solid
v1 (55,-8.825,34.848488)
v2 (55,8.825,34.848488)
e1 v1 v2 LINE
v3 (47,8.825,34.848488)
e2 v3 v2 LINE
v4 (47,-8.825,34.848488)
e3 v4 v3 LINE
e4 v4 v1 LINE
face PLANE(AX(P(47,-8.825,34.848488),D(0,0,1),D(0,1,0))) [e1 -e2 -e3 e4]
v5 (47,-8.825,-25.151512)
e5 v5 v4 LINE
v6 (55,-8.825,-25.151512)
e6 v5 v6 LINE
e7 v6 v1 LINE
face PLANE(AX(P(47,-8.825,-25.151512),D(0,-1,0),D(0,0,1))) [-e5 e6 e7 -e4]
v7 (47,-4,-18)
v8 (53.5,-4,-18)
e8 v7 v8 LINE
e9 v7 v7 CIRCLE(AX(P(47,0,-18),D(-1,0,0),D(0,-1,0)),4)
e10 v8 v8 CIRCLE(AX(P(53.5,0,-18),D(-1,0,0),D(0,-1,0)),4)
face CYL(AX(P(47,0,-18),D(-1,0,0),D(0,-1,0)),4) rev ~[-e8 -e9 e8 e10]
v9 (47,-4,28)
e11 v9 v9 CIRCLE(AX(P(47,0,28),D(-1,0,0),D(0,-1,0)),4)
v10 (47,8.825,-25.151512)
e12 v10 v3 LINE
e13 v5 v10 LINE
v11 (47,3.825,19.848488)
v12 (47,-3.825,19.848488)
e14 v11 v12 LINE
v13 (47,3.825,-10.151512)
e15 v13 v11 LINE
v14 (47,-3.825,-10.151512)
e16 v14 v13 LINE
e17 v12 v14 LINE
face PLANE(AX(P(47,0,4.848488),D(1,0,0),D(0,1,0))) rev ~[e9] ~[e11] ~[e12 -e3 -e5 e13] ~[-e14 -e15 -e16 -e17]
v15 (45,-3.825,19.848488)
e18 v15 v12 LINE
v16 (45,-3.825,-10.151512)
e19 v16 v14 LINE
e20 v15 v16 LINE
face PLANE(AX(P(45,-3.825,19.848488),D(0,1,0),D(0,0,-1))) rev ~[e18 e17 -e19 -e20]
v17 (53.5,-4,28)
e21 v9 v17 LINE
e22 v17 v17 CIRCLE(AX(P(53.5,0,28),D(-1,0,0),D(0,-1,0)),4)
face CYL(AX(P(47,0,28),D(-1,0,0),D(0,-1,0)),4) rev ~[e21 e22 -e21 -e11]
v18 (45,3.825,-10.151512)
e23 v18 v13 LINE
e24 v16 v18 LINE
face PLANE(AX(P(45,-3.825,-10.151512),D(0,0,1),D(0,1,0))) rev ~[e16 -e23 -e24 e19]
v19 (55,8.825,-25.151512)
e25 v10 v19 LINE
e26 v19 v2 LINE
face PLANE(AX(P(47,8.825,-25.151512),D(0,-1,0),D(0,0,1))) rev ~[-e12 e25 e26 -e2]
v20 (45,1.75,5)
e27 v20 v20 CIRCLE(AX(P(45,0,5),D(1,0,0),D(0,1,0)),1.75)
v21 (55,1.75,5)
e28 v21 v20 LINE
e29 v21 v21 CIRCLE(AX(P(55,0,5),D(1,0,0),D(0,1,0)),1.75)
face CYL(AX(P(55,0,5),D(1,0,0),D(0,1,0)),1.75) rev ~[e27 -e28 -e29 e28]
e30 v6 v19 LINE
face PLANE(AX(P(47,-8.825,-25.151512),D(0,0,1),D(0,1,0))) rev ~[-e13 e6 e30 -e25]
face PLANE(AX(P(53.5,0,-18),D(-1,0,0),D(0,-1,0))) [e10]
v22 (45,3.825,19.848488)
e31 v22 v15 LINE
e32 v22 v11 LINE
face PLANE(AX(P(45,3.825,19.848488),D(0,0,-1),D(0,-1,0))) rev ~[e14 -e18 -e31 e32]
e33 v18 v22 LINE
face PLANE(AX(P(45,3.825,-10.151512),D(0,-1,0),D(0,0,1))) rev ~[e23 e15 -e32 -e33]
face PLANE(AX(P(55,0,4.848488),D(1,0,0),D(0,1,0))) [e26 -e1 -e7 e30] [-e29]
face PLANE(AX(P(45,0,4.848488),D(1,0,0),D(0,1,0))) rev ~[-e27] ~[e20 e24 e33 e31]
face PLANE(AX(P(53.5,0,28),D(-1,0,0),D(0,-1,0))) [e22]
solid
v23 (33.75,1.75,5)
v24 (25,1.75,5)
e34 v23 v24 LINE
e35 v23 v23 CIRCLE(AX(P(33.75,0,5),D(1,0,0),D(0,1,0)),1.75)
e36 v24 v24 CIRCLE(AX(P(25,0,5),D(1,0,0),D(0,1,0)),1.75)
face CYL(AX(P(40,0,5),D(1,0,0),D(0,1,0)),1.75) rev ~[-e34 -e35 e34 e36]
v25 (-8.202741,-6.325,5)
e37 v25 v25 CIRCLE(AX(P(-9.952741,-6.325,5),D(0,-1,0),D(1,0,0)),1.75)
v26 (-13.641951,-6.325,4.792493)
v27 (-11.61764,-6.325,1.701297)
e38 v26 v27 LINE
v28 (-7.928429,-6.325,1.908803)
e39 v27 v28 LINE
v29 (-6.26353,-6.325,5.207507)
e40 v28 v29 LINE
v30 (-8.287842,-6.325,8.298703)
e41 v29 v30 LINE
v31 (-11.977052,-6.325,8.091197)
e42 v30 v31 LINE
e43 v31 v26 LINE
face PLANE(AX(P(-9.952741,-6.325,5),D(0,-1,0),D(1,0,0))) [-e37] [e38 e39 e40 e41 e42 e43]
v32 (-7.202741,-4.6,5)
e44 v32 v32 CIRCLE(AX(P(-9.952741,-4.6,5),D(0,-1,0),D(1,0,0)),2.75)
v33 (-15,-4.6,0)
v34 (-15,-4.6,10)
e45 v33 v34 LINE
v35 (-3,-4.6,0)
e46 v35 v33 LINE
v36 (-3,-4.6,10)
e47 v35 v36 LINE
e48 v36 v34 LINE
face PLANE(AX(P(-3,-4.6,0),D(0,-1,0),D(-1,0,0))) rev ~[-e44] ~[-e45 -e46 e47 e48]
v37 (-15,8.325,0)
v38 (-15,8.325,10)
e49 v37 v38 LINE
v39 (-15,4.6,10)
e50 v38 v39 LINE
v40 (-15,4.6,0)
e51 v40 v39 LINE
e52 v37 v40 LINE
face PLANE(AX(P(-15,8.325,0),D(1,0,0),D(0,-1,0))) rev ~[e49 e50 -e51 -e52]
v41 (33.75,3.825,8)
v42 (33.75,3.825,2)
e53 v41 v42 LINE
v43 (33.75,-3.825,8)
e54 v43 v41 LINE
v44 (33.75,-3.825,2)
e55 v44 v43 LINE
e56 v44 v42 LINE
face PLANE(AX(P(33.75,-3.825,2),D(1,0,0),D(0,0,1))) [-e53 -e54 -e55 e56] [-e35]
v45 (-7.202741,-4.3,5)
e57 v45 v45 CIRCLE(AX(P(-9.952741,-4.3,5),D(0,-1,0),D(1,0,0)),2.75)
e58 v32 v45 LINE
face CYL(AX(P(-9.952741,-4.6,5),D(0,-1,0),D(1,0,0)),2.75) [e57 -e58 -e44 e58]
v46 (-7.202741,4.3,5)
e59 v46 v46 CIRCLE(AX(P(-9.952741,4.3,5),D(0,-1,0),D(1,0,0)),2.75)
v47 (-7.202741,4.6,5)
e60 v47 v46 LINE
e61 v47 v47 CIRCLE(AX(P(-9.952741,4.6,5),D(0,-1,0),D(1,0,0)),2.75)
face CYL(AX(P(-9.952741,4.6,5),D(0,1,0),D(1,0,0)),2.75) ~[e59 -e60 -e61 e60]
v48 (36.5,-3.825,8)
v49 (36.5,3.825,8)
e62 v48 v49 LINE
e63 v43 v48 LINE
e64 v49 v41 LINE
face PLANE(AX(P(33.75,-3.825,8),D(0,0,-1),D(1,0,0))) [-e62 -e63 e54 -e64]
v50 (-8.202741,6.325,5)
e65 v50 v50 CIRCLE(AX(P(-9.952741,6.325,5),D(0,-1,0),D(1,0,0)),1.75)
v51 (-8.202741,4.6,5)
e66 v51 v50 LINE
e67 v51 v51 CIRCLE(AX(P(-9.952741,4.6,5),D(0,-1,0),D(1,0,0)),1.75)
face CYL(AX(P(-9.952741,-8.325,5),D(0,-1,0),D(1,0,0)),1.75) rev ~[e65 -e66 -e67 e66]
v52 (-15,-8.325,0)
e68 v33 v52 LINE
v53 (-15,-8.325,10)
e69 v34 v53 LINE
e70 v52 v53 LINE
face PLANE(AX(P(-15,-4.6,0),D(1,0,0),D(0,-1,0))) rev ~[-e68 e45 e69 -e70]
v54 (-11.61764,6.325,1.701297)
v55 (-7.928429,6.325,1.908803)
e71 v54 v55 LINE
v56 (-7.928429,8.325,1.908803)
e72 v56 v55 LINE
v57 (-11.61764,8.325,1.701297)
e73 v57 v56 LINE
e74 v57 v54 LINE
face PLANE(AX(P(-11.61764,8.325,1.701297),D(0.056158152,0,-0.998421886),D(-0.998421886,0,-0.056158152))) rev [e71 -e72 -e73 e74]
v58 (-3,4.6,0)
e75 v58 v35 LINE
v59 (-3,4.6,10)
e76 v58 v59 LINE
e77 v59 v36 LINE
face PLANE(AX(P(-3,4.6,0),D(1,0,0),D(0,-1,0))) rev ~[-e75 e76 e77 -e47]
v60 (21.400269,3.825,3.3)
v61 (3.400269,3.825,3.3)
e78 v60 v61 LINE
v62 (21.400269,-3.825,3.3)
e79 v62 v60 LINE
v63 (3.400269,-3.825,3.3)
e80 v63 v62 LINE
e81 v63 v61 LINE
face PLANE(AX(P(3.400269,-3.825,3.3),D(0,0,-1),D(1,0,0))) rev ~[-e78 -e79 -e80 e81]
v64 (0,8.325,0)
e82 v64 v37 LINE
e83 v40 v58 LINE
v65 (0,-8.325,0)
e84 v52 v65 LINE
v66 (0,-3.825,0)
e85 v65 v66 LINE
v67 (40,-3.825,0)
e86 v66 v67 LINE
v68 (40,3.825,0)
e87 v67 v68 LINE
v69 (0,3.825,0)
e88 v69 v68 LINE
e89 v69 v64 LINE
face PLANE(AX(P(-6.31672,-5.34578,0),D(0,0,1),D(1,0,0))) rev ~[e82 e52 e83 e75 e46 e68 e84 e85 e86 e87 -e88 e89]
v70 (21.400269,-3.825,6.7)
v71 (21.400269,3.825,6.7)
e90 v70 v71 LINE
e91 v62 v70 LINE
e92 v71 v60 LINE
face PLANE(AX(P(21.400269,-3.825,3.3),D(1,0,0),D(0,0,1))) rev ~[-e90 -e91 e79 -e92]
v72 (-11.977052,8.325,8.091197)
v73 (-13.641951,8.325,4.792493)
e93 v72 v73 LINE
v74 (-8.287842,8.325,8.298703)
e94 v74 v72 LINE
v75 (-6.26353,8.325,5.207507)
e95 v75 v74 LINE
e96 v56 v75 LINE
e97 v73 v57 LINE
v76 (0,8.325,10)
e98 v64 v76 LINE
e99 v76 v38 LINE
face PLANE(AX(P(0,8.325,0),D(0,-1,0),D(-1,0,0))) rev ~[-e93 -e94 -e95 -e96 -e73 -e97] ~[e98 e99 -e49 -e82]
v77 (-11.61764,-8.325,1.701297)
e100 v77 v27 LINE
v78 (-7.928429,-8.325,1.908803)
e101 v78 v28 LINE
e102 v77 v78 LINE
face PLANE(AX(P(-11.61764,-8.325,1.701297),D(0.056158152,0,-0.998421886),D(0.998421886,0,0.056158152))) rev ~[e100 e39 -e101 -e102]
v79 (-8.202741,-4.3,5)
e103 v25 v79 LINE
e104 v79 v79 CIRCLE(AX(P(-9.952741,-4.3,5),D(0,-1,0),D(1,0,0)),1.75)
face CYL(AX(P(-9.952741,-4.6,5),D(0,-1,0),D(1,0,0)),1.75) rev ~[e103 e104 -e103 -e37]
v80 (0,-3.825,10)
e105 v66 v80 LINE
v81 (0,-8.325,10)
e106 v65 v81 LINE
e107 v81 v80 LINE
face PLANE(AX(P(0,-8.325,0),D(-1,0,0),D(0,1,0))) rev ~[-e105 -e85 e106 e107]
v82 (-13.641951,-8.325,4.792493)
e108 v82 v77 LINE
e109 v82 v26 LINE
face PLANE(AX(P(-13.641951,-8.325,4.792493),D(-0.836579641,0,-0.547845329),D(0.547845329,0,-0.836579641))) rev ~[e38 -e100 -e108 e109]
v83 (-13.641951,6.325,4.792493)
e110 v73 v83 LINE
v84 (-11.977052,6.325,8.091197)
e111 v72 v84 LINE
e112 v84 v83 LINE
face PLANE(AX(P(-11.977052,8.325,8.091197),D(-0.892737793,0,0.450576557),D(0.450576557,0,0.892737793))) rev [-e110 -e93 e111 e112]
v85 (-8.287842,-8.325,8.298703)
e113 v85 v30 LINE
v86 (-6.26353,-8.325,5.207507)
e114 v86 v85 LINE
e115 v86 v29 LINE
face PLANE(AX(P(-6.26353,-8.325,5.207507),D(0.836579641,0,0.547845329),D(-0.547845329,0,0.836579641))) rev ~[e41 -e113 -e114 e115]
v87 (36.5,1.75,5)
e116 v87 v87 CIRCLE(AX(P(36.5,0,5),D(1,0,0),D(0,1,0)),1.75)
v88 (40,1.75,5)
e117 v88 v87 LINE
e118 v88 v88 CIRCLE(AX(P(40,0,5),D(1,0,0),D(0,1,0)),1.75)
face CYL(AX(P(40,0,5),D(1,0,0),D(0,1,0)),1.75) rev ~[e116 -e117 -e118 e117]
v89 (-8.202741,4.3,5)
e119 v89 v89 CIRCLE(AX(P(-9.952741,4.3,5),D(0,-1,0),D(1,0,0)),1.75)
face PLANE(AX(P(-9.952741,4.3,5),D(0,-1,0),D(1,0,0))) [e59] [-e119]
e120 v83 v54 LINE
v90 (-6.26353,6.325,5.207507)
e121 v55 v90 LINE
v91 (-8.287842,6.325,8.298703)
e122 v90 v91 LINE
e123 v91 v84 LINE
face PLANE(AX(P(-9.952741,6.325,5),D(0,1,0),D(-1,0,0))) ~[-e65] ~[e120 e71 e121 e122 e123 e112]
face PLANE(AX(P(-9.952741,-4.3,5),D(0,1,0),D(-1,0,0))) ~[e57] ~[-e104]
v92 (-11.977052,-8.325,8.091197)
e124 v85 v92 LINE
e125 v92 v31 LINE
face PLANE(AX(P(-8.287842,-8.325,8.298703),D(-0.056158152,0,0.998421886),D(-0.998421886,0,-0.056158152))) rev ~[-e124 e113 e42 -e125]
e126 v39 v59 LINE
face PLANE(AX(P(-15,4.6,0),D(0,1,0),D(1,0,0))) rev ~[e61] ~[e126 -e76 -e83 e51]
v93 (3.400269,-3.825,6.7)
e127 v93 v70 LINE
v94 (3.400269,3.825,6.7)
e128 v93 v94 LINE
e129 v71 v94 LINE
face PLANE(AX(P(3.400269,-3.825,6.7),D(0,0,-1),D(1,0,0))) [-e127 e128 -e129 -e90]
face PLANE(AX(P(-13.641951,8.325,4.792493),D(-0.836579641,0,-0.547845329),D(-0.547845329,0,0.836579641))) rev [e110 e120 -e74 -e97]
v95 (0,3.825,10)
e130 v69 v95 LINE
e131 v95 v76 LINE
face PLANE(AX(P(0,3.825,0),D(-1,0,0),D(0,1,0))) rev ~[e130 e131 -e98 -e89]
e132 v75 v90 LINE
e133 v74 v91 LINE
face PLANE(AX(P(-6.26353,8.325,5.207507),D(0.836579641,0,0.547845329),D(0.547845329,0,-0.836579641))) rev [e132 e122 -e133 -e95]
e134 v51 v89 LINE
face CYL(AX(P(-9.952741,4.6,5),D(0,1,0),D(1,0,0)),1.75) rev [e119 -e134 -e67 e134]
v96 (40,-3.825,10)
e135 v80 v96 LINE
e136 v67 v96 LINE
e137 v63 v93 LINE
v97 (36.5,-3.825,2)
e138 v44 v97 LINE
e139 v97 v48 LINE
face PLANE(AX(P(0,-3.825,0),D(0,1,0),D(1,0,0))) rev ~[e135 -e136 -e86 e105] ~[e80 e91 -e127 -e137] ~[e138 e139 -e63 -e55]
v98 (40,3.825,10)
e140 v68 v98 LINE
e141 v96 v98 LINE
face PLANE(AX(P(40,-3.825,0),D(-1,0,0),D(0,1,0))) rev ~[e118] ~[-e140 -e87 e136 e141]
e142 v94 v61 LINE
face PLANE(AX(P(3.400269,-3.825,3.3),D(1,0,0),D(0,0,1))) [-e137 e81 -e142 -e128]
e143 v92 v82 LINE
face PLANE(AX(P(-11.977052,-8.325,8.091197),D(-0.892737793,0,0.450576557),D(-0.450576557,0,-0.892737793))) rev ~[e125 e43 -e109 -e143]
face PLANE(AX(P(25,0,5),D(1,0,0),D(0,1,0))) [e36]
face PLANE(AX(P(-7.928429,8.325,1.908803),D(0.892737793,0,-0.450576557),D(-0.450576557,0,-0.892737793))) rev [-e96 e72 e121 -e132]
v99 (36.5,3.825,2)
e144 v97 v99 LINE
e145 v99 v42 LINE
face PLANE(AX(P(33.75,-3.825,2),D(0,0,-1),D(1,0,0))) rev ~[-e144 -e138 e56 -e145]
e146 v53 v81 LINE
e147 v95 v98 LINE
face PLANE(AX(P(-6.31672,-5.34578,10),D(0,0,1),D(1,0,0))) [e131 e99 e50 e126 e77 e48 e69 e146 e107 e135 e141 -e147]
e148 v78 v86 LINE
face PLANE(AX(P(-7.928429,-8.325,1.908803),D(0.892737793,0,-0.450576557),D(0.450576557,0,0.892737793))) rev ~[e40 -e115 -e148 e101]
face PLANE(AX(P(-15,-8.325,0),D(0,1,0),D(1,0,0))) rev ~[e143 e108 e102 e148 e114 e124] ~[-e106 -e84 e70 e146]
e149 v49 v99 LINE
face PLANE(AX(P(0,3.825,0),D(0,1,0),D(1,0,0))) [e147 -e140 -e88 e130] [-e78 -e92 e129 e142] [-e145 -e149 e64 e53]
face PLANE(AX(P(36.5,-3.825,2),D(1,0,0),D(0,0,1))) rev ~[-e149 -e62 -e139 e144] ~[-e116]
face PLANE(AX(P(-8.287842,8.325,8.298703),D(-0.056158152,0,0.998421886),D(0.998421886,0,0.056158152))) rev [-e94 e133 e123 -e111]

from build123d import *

# Parameters (mm, degrees)
F0_W      = 40
F0_H      = 3.825
F1_DEPTH  = 10
F2_R      = 1.75
F3_DEPTH  = 16.651
F4_W      = 18
F4_H      = 3.4
F4_W_2    = 2.75
F4_H_2    = 6
F5_DEPTH  = 12.151
F6_R      = 1.75
F7_DEPTH  = 15
F10_DEPTH = 2
F11_W     = 17.65
F11_H     = 60
F12_DEPTH = 8
F13_R     = 1.75
F14_DEPTH = 70.001
F15_R     = 2.75
F15_R_2   = 1.75
F16_DEPTH = 0.3
F17_R     = 1.75
F18_DEPTH = 2
F19_R     = 4
F20_DEPTH = 6.5


# Not quite as in the source:
# - a pattern or mirror of a feature is missing from the dataset's text; its kind, count and spacing are read off the source's solid


with BuildPart() as f1:
    # F0 (on Top) → F1 (new body)
    with BuildSketch(Plane.XY):
        Polygon((0, -3.825), (0, 0), (-3, 0), (-3, -4.6), (-15, -4.6), (-15, -8.325), (0, -8.325), align=None)
        Polygon((-3, 0), (0, 0), (0, 3.825), (0, 8.325), (-15, 8.325), (-15, 4.6), (-3, 4.6), align=None)
        with Locations((20, 1.9125)):
            Rectangle(F0_W, F0_H)
        with Locations((20, -1.9125)):
            Rectangle(F0_W, F0_H)
    extrude(amount=F1_DEPTH)

    # F2 (on face) → F3 (cut, through all)
    with BuildSketch(Plane.XZ.offset(8.325)):
        with Locations((-9.9527407438, 5)):
            Circle(F2_R)
    extrude(amount=-F3_DEPTH, mode=Mode.SUBTRACT)

    # F4 (on face) → F5 (cut, through all)
    with BuildSketch(Plane.XZ.offset(3.825)):
        with Locations((12.4002694301, 5)):
            Rectangle(F4_W, F4_H)
        with Locations((35.125, 5)):
            Rectangle(F4_W_2, F4_H_2)
    extrude(amount=-F5_DEPTH, mode=Mode.SUBTRACT)

    # F6 (on face) → F7 (cut)
    with BuildSketch(Plane.YZ.offset(40)):
        with Locations((0, 5)):
            Circle(F6_R)
    extrude(amount=-F7_DEPTH, mode=Mode.SUBTRACT)

    # F15 (on face) → F16 (join)
    with BuildSketch(Plane.XZ.offset(-4.6)):
        with Locations((-9.9527407438, 5)):
            Circle(F15_R)
        with Locations((-9.9527407438, 5)):
            Circle(F15_R_2, mode=Mode.SUBTRACT)
    f16 = extrude(amount=F16_DEPTH)

    # F16_copies: F16 across plane
    add(f16.mirror(Plane(origin=(0, 0, 0), x_dir=(0, 0, -1), z_dir=(0, -1, 0))))

    # F17 (on face) → F18 (cut)
    with BuildSketch(Plane.XZ.offset(8.325)):
        Polygon((-7.9284293953, 1.9088033227), (-6.2635302189, 5.2075067143), (-8.2878415673, 8.2987033916), (-11.9770520922, 8.0911966773), (-13.6419512686, 4.7924932857), (-11.6176399202, 1.7012966084), align=None)
        with Locations((-9.9527407438, 5)):
            Circle(F17_R, mode=Mode.SUBTRACT)
    f18 = extrude(amount=-F18_DEPTH, mode=Mode.SUBTRACT)

    # F18_copies: F18 across plane
    add(f18.mirror(Plane.ZX), mode=Mode.SUBTRACT)


with BuildPart() as f10:
    # F9 (on offset) → F10 (new body)
    with BuildSketch(Plane.YZ.offset(45)):
        Polygon((3.825, 0), (3.825, 10), (3.825, 19.8484882712), (-3.825, 19.8484882712), (-3.825, 10), (-3.825, 0), (-3.825, -10.1515117288), (3.825, -10.1515117288), align=None)
    extrude(amount=F10_DEPTH)

    # F11 (on face) → F12 (join)
    with BuildSketch(Plane.YZ.offset(47)):
        with Locations((0, 4.8484882712)):
            Rectangle(F11_W, F11_H)
    extrude(amount=F12_DEPTH)

    # F13 (on face) → F14 (cut, through all)
    with BuildSketch(Plane.YZ.offset(55)):
        with Locations((0, 5)):
            Circle(F13_R)
    extrude(amount=-F14_DEPTH, mode=Mode.SUBTRACT)

    # F19 (on face) → F20 (cut)
    with BuildSketch(Plane(origin=(47, 0, 0), x_dir=(0, -1, 0), z_dir=(-1, 0, 0))):
        with Locations((0, 28)):
            Circle(F19_R)
        with Locations((0, -18)):
            Circle(F19_R)
    extrude(amount=-F20_DEPTH, mode=Mode.SUBTRACT)


solid = Compound([f1.part, f10.part])
